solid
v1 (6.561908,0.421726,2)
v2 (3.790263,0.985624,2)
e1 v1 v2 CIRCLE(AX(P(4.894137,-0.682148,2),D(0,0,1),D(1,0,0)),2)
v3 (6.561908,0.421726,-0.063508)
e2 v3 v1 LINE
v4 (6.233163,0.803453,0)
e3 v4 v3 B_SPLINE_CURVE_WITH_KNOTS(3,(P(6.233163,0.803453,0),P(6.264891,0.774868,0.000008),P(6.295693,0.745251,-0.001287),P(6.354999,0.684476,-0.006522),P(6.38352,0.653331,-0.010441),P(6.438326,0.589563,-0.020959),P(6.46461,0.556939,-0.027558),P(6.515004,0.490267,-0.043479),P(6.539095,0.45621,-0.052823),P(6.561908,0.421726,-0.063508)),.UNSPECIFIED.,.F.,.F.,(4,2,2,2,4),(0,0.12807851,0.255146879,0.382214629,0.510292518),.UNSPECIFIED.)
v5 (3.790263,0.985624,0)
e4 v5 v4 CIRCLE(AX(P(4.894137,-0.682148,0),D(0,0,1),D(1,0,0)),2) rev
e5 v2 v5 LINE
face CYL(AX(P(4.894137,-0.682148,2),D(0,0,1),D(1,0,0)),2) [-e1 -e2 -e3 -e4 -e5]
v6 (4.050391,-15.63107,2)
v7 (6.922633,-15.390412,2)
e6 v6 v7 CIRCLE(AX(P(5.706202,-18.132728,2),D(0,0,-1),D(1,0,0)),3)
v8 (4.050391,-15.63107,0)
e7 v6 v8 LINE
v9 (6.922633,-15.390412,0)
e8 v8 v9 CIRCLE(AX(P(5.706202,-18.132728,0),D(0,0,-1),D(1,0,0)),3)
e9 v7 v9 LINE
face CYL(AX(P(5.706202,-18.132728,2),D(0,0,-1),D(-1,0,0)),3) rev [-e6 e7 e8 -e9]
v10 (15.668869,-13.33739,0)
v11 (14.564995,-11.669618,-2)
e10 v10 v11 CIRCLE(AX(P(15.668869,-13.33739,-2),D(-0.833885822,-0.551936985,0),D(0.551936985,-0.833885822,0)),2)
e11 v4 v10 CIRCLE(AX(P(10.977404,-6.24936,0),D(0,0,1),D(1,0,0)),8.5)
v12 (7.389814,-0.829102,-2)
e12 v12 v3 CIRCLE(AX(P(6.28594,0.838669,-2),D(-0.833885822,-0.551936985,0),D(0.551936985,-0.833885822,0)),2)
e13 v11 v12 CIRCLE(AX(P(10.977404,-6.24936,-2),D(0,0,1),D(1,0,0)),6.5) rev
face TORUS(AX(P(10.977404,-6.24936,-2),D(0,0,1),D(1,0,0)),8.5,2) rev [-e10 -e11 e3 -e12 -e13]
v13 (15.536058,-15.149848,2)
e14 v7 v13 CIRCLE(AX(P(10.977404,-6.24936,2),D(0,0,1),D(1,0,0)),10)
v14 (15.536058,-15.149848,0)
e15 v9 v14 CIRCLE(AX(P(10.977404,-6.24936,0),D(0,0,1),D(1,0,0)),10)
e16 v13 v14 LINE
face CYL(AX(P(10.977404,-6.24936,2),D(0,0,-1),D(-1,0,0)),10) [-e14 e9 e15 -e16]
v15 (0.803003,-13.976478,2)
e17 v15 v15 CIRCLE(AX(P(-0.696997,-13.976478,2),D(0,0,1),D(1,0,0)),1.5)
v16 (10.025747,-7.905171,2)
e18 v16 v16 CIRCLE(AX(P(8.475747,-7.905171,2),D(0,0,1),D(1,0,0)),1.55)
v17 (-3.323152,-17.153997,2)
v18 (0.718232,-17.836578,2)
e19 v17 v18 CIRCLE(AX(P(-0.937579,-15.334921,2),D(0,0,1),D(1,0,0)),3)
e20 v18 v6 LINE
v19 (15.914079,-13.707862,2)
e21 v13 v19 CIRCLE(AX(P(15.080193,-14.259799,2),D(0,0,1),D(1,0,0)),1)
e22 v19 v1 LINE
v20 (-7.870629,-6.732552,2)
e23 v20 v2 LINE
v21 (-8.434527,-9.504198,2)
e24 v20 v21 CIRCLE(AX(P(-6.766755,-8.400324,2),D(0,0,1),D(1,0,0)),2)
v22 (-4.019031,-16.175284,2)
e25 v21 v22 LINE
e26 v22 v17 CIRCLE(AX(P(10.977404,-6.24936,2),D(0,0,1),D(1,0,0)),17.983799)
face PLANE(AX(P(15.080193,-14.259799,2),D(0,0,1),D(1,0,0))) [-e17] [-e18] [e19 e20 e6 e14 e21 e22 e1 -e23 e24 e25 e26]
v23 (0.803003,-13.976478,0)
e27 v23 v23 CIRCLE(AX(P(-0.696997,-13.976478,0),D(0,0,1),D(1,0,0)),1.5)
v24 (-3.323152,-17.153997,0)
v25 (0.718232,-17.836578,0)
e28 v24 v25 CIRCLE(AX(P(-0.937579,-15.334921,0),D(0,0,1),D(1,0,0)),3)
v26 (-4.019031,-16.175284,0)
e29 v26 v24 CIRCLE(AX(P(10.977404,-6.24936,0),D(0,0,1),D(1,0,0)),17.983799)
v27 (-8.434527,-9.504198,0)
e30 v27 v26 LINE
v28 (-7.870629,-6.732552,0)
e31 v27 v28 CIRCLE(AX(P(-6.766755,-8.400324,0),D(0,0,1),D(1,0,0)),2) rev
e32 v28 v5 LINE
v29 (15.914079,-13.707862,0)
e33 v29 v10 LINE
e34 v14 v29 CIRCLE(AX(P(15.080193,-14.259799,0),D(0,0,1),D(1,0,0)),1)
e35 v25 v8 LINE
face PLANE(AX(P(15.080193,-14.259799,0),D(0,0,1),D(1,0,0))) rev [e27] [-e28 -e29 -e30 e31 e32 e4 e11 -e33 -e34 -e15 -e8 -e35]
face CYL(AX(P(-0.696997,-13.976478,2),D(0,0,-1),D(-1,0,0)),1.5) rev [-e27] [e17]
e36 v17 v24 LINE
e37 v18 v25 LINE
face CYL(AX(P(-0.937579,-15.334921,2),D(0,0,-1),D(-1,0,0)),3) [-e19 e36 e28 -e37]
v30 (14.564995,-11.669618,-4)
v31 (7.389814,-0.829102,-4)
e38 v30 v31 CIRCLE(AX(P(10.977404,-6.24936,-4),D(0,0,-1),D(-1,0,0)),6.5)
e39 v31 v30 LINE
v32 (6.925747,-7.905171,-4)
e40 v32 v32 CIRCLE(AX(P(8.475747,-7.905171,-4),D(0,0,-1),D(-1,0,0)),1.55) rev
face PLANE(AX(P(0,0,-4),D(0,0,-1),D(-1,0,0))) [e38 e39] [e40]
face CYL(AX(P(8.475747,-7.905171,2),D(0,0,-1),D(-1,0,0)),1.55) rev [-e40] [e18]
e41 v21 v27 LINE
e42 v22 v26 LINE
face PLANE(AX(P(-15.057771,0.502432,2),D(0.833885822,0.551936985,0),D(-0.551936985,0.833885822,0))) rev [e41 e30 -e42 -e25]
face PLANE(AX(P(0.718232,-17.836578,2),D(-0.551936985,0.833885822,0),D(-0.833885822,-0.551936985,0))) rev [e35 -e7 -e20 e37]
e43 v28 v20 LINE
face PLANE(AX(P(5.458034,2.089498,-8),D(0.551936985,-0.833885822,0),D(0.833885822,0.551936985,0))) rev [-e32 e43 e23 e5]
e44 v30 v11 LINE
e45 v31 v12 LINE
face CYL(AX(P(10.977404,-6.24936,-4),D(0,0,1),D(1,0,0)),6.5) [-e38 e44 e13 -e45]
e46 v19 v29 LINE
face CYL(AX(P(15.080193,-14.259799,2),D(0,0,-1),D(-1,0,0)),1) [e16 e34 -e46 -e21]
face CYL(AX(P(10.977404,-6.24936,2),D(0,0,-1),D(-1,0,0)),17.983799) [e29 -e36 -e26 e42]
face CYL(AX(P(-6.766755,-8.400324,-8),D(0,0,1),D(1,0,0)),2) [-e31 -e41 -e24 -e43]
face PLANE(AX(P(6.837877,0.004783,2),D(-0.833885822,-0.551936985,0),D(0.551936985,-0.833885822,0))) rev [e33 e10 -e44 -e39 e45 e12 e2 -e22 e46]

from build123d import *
from build123d.topology import SkipClean

# Parameters (mm, degrees)
EXTRUDE_1_DEPTH     = 2
EXTRUDE_START       = 4
SKETCH_3_R          = 1.55
EXTRUDE_2_DEPTH     = 4
FILLET_1_R          = 2
CUT_EXTRUDE_1_DEPTH = 10
FILLET_2_R          = 2


with BuildPart() as part:
    # 草图2 → 凸台-拉伸1 (new body)
    with BuildSketch(Plane.XY):
        with BuildLine():
            Line((14.564994601, -11.669618141), (7.389813792, -0.829102454))
            Line((7.389813792, -0.829102454), (6.837876806, 0.004783368))
            Line((6.837876806, 0.004783368), (4.07819188, 4.174212479))
            Line((4.07819188, 4.174212479), (3.526254895, 5.008098301))
            Line((3.526254895, 5.008098301), (-3.648925914, 15.848613988))
            Line((-3.648925914, 15.848613988), (-4.2008629, 16.68249981))
            Line((-4.2008629, 16.68249981), (-4.998009984, 17.886857679))
            ThreePointArc((-4.998009984, 17.886857679), (-5.687361464, 18.324420478), (-6.473069172, 18.102316754))
            ThreePointArc((-6.473069172, 18.102316754), (-9.153711125, 14.591132343), (-10.06004351, 10.267613076))
            ThreePointArc((-10.06004351, 10.267613076), (-10.405656258, 8.820717267), (-11.403844954, 7.717732689))
            Line((-11.403844954, 7.717732689), (-14.736003804, 5.512224858))
            ThreePointArc((-14.736003804, 5.512224858), (-15.998358454, 3.706490878), (-15.686779581, 1.525405581))
            ThreePointArc((-15.686779581, 1.525405581), (-15.380816242, 1.008667124), (-15.057770631, 0.502432268))
            Line((-15.057770631, 0.502432268), (-4.019030925, -16.175284173))
            ThreePointArc((-4.019030925, -16.175284173), (-3.679263259, -16.670450943), (-3.323152402, -17.153997481))
            ThreePointArc((-3.323152402, -17.153997481), (-1.437196365, -18.293025266), (0.718231785, -17.83657816))
            Line((0.718231785, -17.83657816), (4.050390635, -15.631070329))
            ThreePointArc((4.050390635, -15.631070329), (5.455716688, -15.143203199), (6.922632961, -15.390412219))
            ThreePointArc((6.922632961, -15.390412219), (11.256585707, -16.245462422), (15.536058254, -15.149847541))
            ThreePointArc((15.536058254, -15.149847541), (16.047506269, -14.513382621), (15.91407867, -13.707861832))
            Line((15.91407867, -13.707861832), (15.116931586, -12.503503963))
            Line((15.116931586, -12.503503963), (14.564994601, -11.669618141))
        make_face()
        with BuildLine():
            ThreePointArc((-1.270469952, 9.628047515), (-3.418495303, 10.065068212), (-3.855516, 7.917042861))
            ThreePointArc((-3.855516, 7.917042861), (-1.707490649, 7.480022164), (-1.270469952, 9.628047515))
        make_face(mode=Mode.SUBTRACT)
        with BuildLine():
            ThreePointArc((7.183223706, -8.76067358), (9.331249057, -9.197694277), (9.768269754, -7.049668926))
            ThreePointArc((9.768269754, -7.049668926), (7.620244403, -6.612648229), (7.183223706, -8.76067358))
        make_face(mode=Mode.SUBTRACT)
        with BuildLine():
            ThreePointArc((-1.947826046, -14.804383569), (0.130908165, -15.227306825), (0.55383142, -13.148572614))
            ThreePointArc((0.55383142, -13.148572614), (-1.524902791, -12.725649358), (-1.947826046, -14.804383569))
        make_face(mode=Mode.SUBTRACT)
        with BuildLine():
            ThreePointArc((-10.484908286, 3.529143828), (-12.563642497, 3.952067083), (-12.986565752, 1.873332872))
            ThreePointArc((-12.986565752, 1.873332872), (-10.907831541, 1.450409617), (-10.484908286, 3.529143828))
        make_face(mode=Mode.SUBTRACT)
    extrude(amount=EXTRUDE_1_DEPTH)

    # 草图3 → 凸台-拉伸2 (add)
    # profile 1 of 2: a face of its own
    with SkipClean():  # the faces are left unmerged after this step: merging them gives an invalid solid
        with BuildSketch(Plane(origin=(0, 0, 0), x_dir=(-1, 0, 0), z_dir=(0, 0, -1)).offset(EXTRUDE_START)):
            with BuildLine():
                ThreePointArc((-3.526254895, 5.008098301), (5.481593353, 6.84076574), (3.648925914, 15.848613988))
                Line((3.648925914, 15.848613988), (-3.526254895, 5.008098301))
            make_face()
            with Locations((2.562992976, 8.772545188)):
                Circle(SKETCH_3_R, mode=Mode.SUBTRACT)
        # profile 2 of 2: a face of its own
        with BuildSketch(Plane(origin=(0, 0, 0), x_dir=(-1, 0, 0), z_dir=(0, 0, -1)).offset(EXTRUDE_START)):
            with BuildLine():
                ThreePointArc((-14.564994601, -11.669618141), (-5.557146353, -9.836950702), (-7.389813792, -0.829102454))
                Line((-7.389813792, -0.829102454), (-14.564994601, -11.669618141))
            make_face()
            with Locations((-8.47574673, -7.905171253)):
                Circle(SKETCH_3_R, mode=Mode.SUBTRACT)
        extrude(amount=-EXTRUDE_2_DEPTH)

    # 圆角1
    # the kernel refuses this fillet: 2 mm, written as the material it adds along each edge
    with BuildSketch(Plane(origin=(10.977404196, -6.249360297, 0), x_dir=(0.5519369853128372, -0.8338858220666526, 0), z_dir=(0.8338858220666526, 0.5519369853128372, 0))) as fillet_1_piece_1:
        with BuildLine():
            CenterArc((6.5 + FILLET_1_R, FILLET_1_R), FILLET_1_R, 180, 90)
            Line((6.5, FILLET_1_R), (6.5, 0))
            Line((6.5, 0), (6.5 + FILLET_1_R, 0))
        make_face()
    revolve(axis=Axis((10.977404196, -6.249360297, 0), (0, 0, -1)), revolution_arc=180)
    with BuildSketch(Plane(origin=(-0.06133551, 10.428356144, 0), x_dir=(0.5519369853122391, -0.8338858220670484, 0), z_dir=(0.8338858220670484, 0.5519369853122391, 0))) as fillet_1_piece_2:
        with BuildLine():
            CenterArc((6.5 + FILLET_1_R, FILLET_1_R), FILLET_1_R, 180, 90)
            Line((6.5, FILLET_1_R), (6.5, 0))
            Line((6.5, 0), (6.5 + FILLET_1_R, 0))
        make_face()
    revolve(axis=Axis((-0.06133551, 10.428356144, 0), (0, 0, -1)), revolution_arc=180)

    # 草图4 → 切除-拉伸1 (cut)
    with BuildSketch(Plane.XY.offset(2)):
        Polygon((5.458034343, 2.089497924), (-9.538400778, -7.836425953), (-26.545257477, 2.73324315), (-0.393587014, 27.879080134), align=None)
    extrude(amount=-CUT_EXTRUDE_1_DEPTH, mode=Mode.SUBTRACT)

    # 圆角2
    # the kernel refuses this fillet: 2 mm, written as the material it takes off along each edge
    with BuildSketch(Plane(origin=(5.458034343, 2.089497924, 7), x_dir=(-0.8338858220669847, -0.5519369853123355, 0), z_dir=(0, 0, -1))) as fillet_2_piece_1:
        with BuildLine():
            CenterArc((FILLET_2_R, -FILLET_2_R), FILLET_2_R, 90, 90)
            Line((0, -FILLET_2_R), (0, 0))
            Line((0, 0), (FILLET_2_R, 0))
        make_face()
    extrude(amount=12, mode=Mode.SUBTRACT)
    with BuildSketch(Plane(origin=(-9.538400778, -7.836425953, 7), x_dir=(0.8338858220669851, 0.5519369853123349, 0), z_dir=(0, 0, -1))) as fillet_2_piece_2:
        with BuildLine():
            CenterArc((FILLET_2_R, FILLET_2_R), FILLET_2_R, 180, 90)
            Line((0, FILLET_2_R), (0, 0))
            Line((0, 0), (FILLET_2_R, 0))
        make_face()
    extrude(amount=12, mode=Mode.SUBTRACT)


solid = part.part
